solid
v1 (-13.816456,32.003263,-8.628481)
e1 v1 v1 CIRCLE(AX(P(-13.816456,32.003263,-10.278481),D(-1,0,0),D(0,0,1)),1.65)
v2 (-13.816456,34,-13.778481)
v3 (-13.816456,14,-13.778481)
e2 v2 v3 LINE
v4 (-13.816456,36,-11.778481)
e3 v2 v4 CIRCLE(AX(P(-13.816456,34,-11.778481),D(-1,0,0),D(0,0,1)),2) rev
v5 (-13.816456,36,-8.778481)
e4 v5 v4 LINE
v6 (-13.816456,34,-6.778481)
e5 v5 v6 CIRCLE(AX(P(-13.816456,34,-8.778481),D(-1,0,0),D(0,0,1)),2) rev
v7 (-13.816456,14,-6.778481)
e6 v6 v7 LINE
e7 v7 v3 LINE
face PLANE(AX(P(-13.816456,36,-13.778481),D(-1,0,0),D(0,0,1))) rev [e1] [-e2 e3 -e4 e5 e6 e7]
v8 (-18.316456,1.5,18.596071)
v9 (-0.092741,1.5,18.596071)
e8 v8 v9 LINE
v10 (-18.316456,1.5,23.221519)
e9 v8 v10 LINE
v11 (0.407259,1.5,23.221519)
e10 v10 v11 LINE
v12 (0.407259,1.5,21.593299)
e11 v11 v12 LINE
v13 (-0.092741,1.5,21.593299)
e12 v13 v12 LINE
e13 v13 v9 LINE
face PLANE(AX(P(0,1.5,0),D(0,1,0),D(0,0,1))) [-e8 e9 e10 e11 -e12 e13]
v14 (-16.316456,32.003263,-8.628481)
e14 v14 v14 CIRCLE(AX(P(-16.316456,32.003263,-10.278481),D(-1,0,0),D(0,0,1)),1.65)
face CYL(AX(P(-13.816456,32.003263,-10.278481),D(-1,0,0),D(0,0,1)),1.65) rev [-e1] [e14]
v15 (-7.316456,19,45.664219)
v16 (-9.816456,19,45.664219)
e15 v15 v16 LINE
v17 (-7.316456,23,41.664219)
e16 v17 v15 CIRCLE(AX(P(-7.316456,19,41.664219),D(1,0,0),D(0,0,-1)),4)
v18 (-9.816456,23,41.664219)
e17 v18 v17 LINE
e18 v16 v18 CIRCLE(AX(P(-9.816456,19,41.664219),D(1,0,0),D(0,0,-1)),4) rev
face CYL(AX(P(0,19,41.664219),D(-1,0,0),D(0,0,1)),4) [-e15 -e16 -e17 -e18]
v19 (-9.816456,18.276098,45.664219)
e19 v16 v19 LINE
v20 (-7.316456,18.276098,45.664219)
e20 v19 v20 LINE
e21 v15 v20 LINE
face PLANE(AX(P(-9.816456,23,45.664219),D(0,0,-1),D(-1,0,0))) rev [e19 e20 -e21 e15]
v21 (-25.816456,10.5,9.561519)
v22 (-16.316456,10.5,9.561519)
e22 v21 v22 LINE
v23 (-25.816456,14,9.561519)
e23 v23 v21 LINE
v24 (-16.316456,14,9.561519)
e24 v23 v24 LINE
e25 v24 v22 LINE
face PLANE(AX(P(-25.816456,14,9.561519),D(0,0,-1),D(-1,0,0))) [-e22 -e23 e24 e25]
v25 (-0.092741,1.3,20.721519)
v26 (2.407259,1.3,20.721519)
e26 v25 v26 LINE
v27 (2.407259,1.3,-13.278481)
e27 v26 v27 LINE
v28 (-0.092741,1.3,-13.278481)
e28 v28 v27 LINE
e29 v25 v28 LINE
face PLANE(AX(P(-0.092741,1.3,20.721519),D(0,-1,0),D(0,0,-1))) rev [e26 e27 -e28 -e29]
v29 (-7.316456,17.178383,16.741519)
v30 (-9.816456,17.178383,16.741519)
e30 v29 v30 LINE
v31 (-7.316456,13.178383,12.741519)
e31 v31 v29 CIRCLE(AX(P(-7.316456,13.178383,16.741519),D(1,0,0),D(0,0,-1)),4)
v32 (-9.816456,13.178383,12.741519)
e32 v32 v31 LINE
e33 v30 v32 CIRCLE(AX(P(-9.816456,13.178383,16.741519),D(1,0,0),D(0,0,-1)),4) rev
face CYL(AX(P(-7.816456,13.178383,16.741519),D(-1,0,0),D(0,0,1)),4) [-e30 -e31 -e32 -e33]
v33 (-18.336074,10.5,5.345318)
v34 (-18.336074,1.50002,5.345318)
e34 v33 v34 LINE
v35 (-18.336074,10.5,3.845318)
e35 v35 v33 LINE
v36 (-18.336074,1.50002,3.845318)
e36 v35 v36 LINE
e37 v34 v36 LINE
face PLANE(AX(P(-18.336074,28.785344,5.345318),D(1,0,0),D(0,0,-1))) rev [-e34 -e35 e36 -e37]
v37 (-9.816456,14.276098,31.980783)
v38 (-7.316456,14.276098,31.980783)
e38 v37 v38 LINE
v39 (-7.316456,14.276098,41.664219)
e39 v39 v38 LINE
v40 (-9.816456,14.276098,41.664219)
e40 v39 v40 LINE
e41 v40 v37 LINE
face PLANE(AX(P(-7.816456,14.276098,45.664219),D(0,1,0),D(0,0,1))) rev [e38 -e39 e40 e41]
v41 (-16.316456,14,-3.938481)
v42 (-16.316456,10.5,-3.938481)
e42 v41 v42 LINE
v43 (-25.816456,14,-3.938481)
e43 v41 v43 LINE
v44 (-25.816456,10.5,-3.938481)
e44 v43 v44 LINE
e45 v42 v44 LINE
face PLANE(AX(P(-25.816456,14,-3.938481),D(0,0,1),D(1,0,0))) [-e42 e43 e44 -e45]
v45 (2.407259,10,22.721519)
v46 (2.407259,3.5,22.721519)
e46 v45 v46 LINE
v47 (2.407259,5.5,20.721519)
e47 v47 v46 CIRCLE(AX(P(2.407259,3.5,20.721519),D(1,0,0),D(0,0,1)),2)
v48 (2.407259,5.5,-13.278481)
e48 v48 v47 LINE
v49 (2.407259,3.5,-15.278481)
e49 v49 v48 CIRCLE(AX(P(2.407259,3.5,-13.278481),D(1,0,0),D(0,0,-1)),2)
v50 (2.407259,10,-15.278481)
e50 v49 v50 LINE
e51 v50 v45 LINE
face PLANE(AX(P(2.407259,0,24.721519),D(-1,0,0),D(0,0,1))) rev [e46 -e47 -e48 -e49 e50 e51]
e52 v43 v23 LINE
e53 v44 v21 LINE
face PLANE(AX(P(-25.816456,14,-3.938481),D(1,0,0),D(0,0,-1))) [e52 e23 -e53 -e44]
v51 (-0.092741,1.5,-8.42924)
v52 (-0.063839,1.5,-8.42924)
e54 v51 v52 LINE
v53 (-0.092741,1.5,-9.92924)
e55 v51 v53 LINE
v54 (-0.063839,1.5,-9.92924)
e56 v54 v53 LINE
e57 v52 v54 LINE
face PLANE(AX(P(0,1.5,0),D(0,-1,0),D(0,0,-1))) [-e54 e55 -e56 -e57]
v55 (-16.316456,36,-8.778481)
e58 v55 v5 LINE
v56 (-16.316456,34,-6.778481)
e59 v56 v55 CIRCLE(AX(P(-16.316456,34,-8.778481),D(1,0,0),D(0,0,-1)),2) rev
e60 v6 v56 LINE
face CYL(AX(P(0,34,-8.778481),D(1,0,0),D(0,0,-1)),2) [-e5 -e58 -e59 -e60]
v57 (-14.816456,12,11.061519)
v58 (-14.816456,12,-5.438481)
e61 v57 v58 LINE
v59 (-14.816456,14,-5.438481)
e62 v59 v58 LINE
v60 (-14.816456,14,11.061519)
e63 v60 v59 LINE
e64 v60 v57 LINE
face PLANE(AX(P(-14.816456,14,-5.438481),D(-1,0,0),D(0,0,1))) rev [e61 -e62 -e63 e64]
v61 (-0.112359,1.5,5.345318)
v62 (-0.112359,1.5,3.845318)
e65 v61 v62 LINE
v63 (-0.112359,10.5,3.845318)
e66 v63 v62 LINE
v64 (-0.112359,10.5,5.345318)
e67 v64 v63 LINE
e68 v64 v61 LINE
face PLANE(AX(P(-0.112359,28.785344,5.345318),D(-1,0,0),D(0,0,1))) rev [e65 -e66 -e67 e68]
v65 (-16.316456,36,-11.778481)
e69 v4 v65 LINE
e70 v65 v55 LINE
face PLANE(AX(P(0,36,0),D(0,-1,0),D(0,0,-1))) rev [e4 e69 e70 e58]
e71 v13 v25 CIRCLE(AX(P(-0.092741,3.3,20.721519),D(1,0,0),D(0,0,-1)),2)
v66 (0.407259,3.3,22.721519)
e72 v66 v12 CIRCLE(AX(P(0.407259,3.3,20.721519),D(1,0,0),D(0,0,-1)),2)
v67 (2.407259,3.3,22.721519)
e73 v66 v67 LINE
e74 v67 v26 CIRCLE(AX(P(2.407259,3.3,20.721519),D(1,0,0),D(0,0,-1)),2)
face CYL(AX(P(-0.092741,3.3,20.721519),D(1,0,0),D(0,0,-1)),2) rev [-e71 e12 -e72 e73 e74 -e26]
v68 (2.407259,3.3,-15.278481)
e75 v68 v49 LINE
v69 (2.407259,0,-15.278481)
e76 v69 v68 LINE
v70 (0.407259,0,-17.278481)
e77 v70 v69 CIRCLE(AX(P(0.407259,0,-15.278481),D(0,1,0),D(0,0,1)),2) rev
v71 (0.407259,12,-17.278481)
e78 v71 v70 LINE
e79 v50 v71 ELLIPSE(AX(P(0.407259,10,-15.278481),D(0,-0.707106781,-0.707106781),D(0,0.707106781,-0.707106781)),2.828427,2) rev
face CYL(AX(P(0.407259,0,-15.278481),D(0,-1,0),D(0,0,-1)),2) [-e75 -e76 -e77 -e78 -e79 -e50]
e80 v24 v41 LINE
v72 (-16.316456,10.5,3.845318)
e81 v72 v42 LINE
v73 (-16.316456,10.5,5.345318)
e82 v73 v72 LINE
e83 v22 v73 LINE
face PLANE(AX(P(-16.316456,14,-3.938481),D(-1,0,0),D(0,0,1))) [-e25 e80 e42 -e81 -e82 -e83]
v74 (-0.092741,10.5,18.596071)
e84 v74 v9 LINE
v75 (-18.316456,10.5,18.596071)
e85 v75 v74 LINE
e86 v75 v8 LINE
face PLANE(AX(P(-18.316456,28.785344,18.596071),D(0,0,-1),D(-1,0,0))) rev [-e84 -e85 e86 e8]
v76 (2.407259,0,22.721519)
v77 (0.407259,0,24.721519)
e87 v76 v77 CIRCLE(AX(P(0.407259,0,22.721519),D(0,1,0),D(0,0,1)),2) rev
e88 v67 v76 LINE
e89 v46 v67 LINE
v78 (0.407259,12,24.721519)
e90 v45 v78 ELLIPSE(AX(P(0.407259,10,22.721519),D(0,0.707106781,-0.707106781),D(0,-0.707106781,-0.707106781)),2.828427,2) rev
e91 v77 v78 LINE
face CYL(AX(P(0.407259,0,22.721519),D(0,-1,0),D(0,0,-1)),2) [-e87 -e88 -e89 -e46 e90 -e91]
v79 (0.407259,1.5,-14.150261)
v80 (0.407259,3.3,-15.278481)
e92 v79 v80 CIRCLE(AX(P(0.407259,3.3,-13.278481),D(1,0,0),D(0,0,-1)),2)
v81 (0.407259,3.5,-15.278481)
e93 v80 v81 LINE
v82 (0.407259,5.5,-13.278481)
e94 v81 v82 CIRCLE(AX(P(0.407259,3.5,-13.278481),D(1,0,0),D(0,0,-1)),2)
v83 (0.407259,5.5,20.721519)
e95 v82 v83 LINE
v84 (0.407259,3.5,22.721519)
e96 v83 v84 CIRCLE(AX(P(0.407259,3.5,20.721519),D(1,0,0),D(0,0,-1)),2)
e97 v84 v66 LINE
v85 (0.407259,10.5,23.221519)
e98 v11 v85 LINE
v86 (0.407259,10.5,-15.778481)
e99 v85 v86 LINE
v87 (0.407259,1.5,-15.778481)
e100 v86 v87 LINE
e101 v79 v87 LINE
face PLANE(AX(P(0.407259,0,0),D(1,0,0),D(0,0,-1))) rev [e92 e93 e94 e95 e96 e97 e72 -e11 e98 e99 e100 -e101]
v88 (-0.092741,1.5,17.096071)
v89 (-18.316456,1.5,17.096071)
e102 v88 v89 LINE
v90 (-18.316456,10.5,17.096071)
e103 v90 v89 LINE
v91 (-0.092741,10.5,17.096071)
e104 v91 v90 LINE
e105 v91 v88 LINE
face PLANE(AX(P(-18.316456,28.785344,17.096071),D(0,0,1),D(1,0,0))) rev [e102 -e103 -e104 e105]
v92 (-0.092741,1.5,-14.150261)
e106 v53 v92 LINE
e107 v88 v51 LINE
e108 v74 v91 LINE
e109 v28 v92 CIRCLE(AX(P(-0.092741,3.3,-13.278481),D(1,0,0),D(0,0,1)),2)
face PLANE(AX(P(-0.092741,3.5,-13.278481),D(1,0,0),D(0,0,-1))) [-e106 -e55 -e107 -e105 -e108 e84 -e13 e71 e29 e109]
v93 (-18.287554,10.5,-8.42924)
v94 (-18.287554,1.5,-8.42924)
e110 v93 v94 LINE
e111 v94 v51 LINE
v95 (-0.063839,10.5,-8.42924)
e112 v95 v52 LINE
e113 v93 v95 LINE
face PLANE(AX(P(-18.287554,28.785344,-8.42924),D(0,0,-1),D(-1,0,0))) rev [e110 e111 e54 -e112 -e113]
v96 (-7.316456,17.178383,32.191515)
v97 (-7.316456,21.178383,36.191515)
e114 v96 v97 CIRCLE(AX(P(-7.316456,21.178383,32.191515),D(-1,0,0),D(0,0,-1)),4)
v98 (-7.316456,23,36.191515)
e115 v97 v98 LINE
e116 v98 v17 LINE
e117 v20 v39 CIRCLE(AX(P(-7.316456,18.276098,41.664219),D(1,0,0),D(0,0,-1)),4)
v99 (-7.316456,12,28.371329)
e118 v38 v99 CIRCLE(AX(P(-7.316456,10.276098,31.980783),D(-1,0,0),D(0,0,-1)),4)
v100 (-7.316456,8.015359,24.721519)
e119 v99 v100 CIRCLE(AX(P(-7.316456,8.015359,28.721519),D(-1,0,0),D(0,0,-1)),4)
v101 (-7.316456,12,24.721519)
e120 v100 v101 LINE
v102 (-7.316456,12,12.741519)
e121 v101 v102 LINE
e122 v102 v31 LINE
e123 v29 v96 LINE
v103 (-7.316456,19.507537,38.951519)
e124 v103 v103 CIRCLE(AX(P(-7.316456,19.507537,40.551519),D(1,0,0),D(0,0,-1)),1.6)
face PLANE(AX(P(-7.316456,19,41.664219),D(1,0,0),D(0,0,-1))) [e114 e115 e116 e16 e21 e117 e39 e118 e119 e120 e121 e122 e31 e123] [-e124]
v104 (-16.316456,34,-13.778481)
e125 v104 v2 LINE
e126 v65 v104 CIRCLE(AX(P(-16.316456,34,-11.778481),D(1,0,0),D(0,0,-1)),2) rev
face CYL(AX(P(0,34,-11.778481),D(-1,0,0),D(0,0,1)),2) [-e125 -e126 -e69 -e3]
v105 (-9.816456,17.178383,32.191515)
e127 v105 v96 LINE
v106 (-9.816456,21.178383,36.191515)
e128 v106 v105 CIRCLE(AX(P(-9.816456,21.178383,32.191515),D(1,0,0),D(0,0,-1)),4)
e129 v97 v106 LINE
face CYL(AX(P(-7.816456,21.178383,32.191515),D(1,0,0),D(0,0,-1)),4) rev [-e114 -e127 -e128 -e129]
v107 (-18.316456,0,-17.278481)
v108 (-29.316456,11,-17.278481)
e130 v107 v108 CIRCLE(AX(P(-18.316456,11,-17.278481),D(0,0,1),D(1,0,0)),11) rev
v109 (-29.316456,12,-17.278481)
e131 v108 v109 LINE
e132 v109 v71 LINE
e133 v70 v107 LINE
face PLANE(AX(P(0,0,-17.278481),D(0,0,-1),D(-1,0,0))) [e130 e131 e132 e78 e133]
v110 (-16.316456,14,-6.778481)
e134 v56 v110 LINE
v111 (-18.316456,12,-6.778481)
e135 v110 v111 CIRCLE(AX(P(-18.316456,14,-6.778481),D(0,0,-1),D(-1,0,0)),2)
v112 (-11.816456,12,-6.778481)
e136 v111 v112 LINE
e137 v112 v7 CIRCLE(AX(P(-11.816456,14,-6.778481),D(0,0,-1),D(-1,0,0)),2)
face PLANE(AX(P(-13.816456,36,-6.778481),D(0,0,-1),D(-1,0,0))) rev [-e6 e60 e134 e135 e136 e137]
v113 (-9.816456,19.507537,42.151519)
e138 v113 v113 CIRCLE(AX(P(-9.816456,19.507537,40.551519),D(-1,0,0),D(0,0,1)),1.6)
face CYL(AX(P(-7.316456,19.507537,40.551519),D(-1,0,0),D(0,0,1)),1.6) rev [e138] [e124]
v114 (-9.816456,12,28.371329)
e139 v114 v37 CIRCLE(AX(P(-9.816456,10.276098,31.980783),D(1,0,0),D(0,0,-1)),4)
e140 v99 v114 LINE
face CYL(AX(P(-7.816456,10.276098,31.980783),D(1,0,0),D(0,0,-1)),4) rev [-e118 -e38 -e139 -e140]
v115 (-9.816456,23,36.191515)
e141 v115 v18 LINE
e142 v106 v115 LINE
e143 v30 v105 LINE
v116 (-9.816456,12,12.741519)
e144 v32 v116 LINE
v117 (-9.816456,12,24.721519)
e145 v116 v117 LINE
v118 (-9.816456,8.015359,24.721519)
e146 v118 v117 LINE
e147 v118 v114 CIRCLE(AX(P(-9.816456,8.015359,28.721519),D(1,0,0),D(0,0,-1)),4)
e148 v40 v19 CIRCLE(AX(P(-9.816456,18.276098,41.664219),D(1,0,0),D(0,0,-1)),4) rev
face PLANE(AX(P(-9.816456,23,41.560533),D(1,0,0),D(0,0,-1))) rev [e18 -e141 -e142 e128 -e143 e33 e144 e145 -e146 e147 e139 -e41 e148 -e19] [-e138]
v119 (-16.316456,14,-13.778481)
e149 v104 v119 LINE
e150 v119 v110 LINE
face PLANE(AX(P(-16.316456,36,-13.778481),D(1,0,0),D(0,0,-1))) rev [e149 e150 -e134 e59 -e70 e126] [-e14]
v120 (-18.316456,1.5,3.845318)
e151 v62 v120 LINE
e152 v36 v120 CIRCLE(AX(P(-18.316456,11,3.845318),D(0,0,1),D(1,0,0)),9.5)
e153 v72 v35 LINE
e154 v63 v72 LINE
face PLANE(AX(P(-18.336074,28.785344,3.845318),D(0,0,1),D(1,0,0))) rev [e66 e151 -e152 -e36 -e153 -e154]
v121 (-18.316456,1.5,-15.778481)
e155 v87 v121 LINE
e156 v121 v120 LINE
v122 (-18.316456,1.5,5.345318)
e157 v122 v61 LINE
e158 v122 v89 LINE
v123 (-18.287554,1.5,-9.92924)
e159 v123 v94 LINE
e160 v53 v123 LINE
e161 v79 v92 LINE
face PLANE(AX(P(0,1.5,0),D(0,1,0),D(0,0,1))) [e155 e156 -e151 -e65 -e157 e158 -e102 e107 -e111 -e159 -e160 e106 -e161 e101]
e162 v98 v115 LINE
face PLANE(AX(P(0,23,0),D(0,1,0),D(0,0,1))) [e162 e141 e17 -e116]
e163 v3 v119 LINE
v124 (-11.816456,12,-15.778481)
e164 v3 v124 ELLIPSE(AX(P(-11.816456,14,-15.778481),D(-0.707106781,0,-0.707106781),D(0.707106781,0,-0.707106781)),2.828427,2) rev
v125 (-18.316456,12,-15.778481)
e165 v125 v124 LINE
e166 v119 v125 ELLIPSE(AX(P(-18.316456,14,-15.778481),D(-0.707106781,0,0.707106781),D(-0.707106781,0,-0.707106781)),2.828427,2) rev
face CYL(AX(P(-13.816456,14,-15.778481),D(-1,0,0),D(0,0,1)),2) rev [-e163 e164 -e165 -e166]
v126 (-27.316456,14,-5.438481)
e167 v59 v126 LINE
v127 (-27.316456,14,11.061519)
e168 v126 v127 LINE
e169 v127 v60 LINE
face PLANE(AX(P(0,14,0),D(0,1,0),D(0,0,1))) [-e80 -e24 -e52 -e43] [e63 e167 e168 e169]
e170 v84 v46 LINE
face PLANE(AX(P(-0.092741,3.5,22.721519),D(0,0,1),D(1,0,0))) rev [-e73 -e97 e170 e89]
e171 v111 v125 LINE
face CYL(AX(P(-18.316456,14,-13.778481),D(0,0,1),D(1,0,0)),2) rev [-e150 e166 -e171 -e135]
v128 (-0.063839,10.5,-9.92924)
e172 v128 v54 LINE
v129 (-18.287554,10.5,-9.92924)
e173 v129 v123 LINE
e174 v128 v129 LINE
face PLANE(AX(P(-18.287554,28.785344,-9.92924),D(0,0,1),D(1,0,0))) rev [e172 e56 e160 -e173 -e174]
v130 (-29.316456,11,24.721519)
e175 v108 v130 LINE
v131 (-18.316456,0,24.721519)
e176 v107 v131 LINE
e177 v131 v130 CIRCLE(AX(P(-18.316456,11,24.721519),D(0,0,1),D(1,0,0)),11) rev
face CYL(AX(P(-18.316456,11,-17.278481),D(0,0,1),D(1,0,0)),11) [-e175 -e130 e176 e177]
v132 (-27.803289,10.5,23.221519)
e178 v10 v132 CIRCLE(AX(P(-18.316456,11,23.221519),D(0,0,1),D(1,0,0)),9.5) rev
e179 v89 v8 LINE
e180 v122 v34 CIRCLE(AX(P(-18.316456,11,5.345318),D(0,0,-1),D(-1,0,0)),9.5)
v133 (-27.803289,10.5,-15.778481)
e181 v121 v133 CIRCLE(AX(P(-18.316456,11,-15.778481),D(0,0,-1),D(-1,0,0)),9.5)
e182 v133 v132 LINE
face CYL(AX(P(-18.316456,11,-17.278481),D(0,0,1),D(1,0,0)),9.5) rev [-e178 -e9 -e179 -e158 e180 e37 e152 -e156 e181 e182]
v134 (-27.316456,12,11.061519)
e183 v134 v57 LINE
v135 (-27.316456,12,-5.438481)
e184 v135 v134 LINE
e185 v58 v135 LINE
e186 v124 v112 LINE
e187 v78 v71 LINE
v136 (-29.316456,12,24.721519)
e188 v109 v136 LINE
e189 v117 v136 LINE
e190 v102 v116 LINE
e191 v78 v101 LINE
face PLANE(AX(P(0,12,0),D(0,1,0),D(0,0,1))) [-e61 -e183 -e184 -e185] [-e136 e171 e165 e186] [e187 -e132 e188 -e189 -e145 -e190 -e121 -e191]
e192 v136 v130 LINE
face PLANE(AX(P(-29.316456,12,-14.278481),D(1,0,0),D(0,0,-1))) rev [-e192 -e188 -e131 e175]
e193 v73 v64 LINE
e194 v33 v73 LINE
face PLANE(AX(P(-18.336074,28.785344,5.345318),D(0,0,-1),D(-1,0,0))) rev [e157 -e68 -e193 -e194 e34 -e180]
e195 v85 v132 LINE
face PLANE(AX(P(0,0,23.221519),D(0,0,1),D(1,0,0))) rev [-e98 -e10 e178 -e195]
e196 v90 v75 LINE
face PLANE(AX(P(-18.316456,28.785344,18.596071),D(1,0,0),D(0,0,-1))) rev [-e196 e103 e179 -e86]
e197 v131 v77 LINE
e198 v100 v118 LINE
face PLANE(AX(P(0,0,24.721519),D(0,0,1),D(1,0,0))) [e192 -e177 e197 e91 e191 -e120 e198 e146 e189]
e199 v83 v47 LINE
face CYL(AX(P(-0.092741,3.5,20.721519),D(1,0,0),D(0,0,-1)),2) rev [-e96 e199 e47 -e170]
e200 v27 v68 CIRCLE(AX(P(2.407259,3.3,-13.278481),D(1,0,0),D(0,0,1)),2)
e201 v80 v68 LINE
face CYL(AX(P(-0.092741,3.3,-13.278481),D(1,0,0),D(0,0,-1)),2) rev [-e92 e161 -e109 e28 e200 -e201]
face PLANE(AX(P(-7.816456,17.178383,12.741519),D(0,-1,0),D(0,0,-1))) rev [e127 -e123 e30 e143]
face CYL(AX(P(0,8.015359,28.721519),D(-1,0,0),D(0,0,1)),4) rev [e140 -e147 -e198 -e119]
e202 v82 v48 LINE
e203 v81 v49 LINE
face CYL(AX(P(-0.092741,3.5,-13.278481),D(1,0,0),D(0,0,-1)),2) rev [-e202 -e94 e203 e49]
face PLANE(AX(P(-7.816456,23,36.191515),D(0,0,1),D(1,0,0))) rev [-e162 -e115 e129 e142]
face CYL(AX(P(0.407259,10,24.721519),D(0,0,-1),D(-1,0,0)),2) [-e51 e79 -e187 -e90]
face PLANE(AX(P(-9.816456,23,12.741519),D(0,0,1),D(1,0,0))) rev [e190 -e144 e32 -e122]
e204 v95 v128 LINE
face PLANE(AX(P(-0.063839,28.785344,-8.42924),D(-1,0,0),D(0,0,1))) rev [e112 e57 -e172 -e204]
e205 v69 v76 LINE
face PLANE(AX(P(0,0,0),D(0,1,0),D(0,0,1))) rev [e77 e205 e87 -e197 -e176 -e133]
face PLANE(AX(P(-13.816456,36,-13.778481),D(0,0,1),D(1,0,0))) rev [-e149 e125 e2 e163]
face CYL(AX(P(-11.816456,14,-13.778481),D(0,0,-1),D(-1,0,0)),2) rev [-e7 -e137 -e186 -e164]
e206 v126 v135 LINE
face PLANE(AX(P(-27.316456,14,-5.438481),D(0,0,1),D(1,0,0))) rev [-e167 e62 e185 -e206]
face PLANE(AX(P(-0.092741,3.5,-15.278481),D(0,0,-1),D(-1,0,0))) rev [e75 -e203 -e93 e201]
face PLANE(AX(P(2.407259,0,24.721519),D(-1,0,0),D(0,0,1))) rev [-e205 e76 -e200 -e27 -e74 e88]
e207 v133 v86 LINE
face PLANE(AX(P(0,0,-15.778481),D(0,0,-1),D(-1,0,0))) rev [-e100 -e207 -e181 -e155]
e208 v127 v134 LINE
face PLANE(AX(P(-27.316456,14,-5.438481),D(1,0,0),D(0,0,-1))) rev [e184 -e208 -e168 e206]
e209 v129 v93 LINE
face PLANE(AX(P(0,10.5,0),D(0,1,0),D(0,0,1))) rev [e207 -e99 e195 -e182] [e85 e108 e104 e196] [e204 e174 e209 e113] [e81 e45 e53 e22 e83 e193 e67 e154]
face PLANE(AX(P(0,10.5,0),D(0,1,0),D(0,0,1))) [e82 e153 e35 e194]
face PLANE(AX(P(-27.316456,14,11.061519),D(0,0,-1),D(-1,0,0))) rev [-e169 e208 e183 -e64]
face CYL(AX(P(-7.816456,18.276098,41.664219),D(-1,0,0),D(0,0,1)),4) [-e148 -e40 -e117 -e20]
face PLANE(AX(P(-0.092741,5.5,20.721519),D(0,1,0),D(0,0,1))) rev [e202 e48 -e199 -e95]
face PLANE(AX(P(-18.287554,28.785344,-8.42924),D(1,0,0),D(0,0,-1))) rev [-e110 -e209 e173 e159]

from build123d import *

# Parameters (mm, degrees)
SALIENTE_EXTRUIR1_DEPTH  = 12
CROQUIS2_W               = 12.5
CROQUIS2_H               = 16.5
CROQUIS2_W_2             = 9.5
CROQUIS2_H_2             = 13.5
SALIENTE_EXTRUIR2_DEPTH  = 2
SALIENTE_EXTRUIR4_DEPTH  = 11
CROQUIS4_R               = 1.6
CORTAR_EXTRUIR1_DEPTH    = 2.5
CROQUIS5_W               = 17.29289048
CROQUIS5_H               = 2.276098228
CROQUIS5_W_2             = 23.449996424
CROQUIS5_H_2             = 5.821617307
CORTAR_EXTRUIR2_DEPTH    = 2
SALIENTE_EXTRUIR5_DEPTH  = 3
CROQUIS7_W               = 60
CROQUIS7_H               = 12
SALIENTE_EXTRUIR6_DEPTH  = 3
CORTAR_EXTRUIR3_DEPTH    = 42
VACIADO4_START           = -15.778481013
VACIADO4_DEPTH           = 39
VACIADO4_2_OUTLINE_W     = 28
VACIADO4_2_OUTLINE_H     = 9
VACIADO4_2_DEPTH         = 4
VACIADO4_START_2         = 19.221518987
VACIADO4_3_OUTLINE_W     = 28
VACIADO4_3_OUTLINE_H     = 9
VACIADO4_3_DEPTH         = 4
VACIADO4_START_3         = -3.938481013
VACIADO4_4_OUTLINE_W     = 9.5
VACIADO4_4_OUTLINE_H     = 1.5
VACIADO4_4_DEPTH         = 13.5
REDONDEO2_R              = 4
REDONDEO3_R              = 4
CROQUIS10_W              = 2.5
CROQUIS10_H              = 7
SALIENTE_EXTRUIR8_DEPTH  = 24
CROQUIS11_R              = 1.65
CORTAR_EXTRUIR4_DEPTH    = 2.5
CROQUIS14_R              = 1.6
SALIENTE_EXTRUIR10_DEPTH = 0.5
CROQUIS15_W              = 28.276285021
CROQUIS15_H              = 42
CORTAR_EXTRUIR5_DEPTH    = 12
CROQUIS16_W              = 42
CROQUIS16_H              = 12
SALIENTE_EXTRUIR11_DEPTH = 2
CORTAR_EXTRUIR6_DEPTH    = 2.5
CROQUIS19_W              = 18.223714979
CROQUIS19_H              = 1.5
SALIENTE_EXTRUIR16_DEPTH = 9
REDONDEO4_R              = 2
REDONDEO5_R              = 2
REDONDEO6_R              = 2


with BuildPart() as part:
    # Croquis1 → Saliente-Extruir1 (new body)
    with BuildSketch(Plane(origin=(0, 0, 0), x_dir=(1, 0, 0), z_dir=(0, 1, 0))):
        Polygon((30.683544304, -17.721518987), (30.683544304, -21.721518987), (-29.316455696, -21.721518987), (-29.316455696, 14.278481013), (30.683544304, 14.278481013), (30.683544304, 10.278481013), (2.683544304, 10.278481013), (2.683544304, -17.721518987), align=None)
    extrude(amount=SALIENTE_EXTRUIR1_DEPTH)

    # Croquis2 → Saliente-Extruir2 (add)
    with BuildSketch(Plane(origin=(0, 12, 0), x_dir=(1, 0, 0), z_dir=(0, 1, 0))):
        with Locations((-21.066455696, -2.811518987)):
            Rectangle(CROQUIS2_W, CROQUIS2_H)
        with Locations((-21.066455696, -2.811518987)):
            Rectangle(CROQUIS2_W_2, CROQUIS2_H_2, mode=Mode.SUBTRACT)
    extrude(amount=SALIENTE_EXTRUIR2_DEPTH)

    # Croquis3 → Saliente-Extruir4 (add)
    with BuildSketch(Plane(origin=(0, 12, 0), x_dir=(1, 0, 0), z_dir=(0, 1, 0))):
        Polygon((-7.816455696, -12.741518987), (-7.816455696, -41.560532566), (-7.816455696, -45.664219129), (-9.816455696, -45.664219129), (-9.816455696, -41.560532566), (-9.816455696, -12.741518987), align=None)
    extrude(amount=SALIENTE_EXTRUIR4_DEPTH)

    # Croquis4 → Cortar-Extruir1 (cut)
    with BuildSketch(Plane.ZY.offset(9.816455696)):
        with Locations((40.551518987, 19.507537468)):
            Circle(CROQUIS4_R)
    extrude(amount=-CORTAR_EXTRUIR1_DEPTH, mode=Mode.SUBTRACT)

    # Croquis5 → Cortar-Extruir2 (cut)
    with BuildSketch(Plane.ZY.offset(9.816455696)):
        with Locations((37.017773889, 13.138049114)):
            Rectangle(CROQUIS5_W, CROQUIS5_H)
        with Locations((24.466517199, 20.089191347)):
            Rectangle(CROQUIS5_W_2, CROQUIS5_H_2)
    extrude(amount=-CORTAR_EXTRUIR2_DEPTH, mode=Mode.SUBTRACT)

    # Croquis6 → Saliente-Extruir5 (add)
    with BuildSketch(Plane.XY.offset(21.721518987)):
        Polygon((-29.316455696, 0), (30.683544304, 0), (30.683544304, 12), (-7.816455696, 12), (-9.816455696, 12), (-29.316455696, 12), align=None)
    extrude(amount=SALIENTE_EXTRUIR5_DEPTH)

    # Croquis7 → Saliente-Extruir6 (add)
    with BuildSketch(Plane(origin=(0, 0, -14.278481013), x_dir=(-1, 0, 0), z_dir=(0, 0, -1))):
        with Locations((-0.683544304, 6)):
            Rectangle(CROQUIS7_W, CROQUIS7_H)
    extrude(amount=SALIENTE_EXTRUIR6_DEPTH)

    # Croquis8 → Cortar-Extruir3 (cut)
    with BuildSketch(Plane.XY.offset(24.721518987)):
        with BuildLine():
            Line((-29.316455696, 0), (-18.316455696, 0))
            ThreePointArc((-18.316455696, 0), (-26.094630289, 3.221825407), (-29.316455696, 11))
            Line((-29.316455696, 11), (-29.316455696, 0))
        make_face()
    extrude(amount=-CORTAR_EXTRUIR3_DEPTH, mode=Mode.SUBTRACT)

    # Vaciado4: read off the stored shape, not the designer's step
    # Vaciado4 outline → Vaciado4 (cut)
    with BuildSketch(Plane.XY.offset(VACIADO4_START)):
        with BuildLine():
            Line((1.183544304, 10.5), (-27.803288677, 10.5))
            ThreePointArc((-27.803288677, 10.5), (-24.854804112, 4.107975624), (-18.316455696, 1.5))
            Line((-18.316455696, 1.5), (1.183544304, 1.5))
            Line((1.183544304, 1.5), (1.183544304, 10.5))
        make_face()
    extrude(amount=VACIADO4_DEPTH, mode=Mode.SUBTRACT)

    # Vaciado4 2 outline → Vaciado4 2 (cut)
    with BuildSketch(Plane.XY.offset(VACIADO4_START)):
        with Locations((15.183544304, 6)):
            Rectangle(VACIADO4_2_OUTLINE_W, VACIADO4_2_OUTLINE_H)
    extrude(amount=VACIADO4_2_DEPTH, mode=Mode.SUBTRACT)

    # Vaciado4 3 outline → Vaciado4 3 (cut)
    with BuildSketch(Plane.XY.offset(VACIADO4_START_2)):
        with Locations((15.183544304, 6)):
            Rectangle(VACIADO4_3_OUTLINE_W, VACIADO4_3_OUTLINE_H)
    extrude(amount=VACIADO4_3_DEPTH, mode=Mode.SUBTRACT)

    # Vaciado4 4 outline → Vaciado4 4 (cut)
    with BuildSketch(Plane.XY.offset(VACIADO4_START_3)):
        with Locations((-21.066455696, 11.25)):
            Rectangle(VACIADO4_4_OUTLINE_W, VACIADO4_4_OUTLINE_H)
    extrude(amount=VACIADO4_4_DEPTH, mode=Mode.SUBTRACT)

    # Redondeo2
    # the kernel refuses this fillet: 4 mm, written as the material it adds along each edge
    with BuildSketch(Plane(origin=(-9.816455696, 12, 24.721518987), x_dir=(0, -1, 0), z_dir=(1, 0, 0))) as redondeo2_piece_1:
        with BuildLine():
            CenterArc((3.984641355, -4), REDONDEO2_R, 90, 84.977462971)
            Line((0, -3.649809662), (0, 0))
            Line((0, 0), (3.984641355, 0))
        make_face()
    extrude(amount=2)
    with BuildSketch(Plane(origin=(-9.816455696, 14.276098228, 28.371328649), x_dir=(0, 0, 1), z_dir=(1, 0, 0))) as redondeo2_piece_2:
        with BuildLine():
            CenterArc((3.609454623, 4), REDONDEO2_R, 205.52948015, 64.47051985)
            Line((0, 2.276098228), (0, 0))
            Line((0, 0), (3.609454623, 0))
        make_face()
    extrude(amount=2)
    with BuildSketch(Plane(origin=(-9.816455696, 17.178382693, 36.191515411), x_dir=(0, 0, -1), z_dir=(1, 0, 0))) as redondeo2_piece_3:
        with BuildLine():
            CenterArc((REDONDEO2_R, REDONDEO2_R), REDONDEO2_R, 180, 90)
            Line((0, REDONDEO2_R), (0, 0))
            Line((0, 0), (REDONDEO2_R, 0))
        make_face()
    extrude(amount=2)
    # the kernel refuses this fillet: 4 mm, written as the material it takes off along each edge
    with BuildSketch(Plane(origin=(-19.816455696, 17.178382693, 12.741518987), x_dir=(0, 0, 1), z_dir=(1, 0, 0))) as redondeo2_2_piece_1:
        with BuildLine():
            CenterArc((REDONDEO2_R, REDONDEO2_R), REDONDEO2_R, 180, 90)
            Line((0, REDONDEO2_R), (0, 0))
            Line((0, 0), (REDONDEO2_R, 0))
        make_face()
    extrude(amount=22, mode=Mode.SUBTRACT)

    # Redondeo3
    redondeo3_edges = [part.edges().sort_by_distance(p)[0] for p in [
        (-8.816455696, 23, 45.664219129),
        (-8.816455696, 14.276098228, 45.664219129),
    ]]
    fillet(redondeo3_edges, radius=REDONDEO3_R)

    # Croquis10 → Saliente-Extruir8 (add)
    with BuildSketch(Plane(origin=(0, 12, 0), x_dir=(1, 0, 0), z_dir=(0, 1, 0))):
        with Locations((-15.066455696, 10.278481013)):
            Rectangle(CROQUIS10_W, CROQUIS10_H)
    extrude(amount=SALIENTE_EXTRUIR8_DEPTH)

    # Croquis11 → Cortar-Extruir4 (cut)
    with BuildSketch(Plane.ZY.offset(16.316455696)):
        with Locations((-10.278481013, 32.003262859)):
            Circle(CROQUIS11_R)
    extrude(amount=-CORTAR_EXTRUIR4_DEPTH, mode=Mode.SUBTRACT)

    # Croquis14 → Saliente-Extruir10 (add)
    with BuildSketch(Plane(origin=(-7.816455696, 0, 0), x_dir=(0, 0, -1), z_dir=(1, 0, 0))):
        with BuildLine():
            Line((-36.191515411, 23), (-41.664219129, 23))
            ThreePointArc((-41.664219129, 23), (-44.492646254, 21.828427125), (-45.664219129, 19))
            Line((-45.664219129, 19), (-45.664219129, 18.276098228))
            ThreePointArc((-45.664219129, 18.276098228), (-44.492646254, 15.447671103), (-41.664219129, 14.276098228))
            Line((-41.664219129, 14.276098228), (-31.980783273, 14.276098228))
            ThreePointArc((-31.980783273, 14.276098228), (-29.847195577, 13.659558519), (-28.371328649, 12))
            ThreePointArc((-28.371328649, 12), (-25.771878217, 10.717139414), (-24.721518987, 8.015358645))
            Line((-24.721518987, 8.015358645), (-24.721518987, 12))
            Line((-24.721518987, 12), (-12.741518987, 12))
            Line((-12.741518987, 12), (-12.741518987, 13.178382693))
            ThreePointArc((-12.741518987, 13.178382693), (-13.913091863, 16.006809817), (-16.741518987, 17.178382693))
            Line((-16.741518987, 17.178382693), (-32.191515411, 17.178382693))
            ThreePointArc((-32.191515411, 17.178382693), (-35.019942535, 18.349955568), (-36.191515411, 21.178382693))
            Line((-36.191515411, 21.178382693), (-36.191515411, 23))
        make_face()
        with Locations(Location((-40.551518987, 19.507537468, 0), (0, 0, 180))):
            Circle(CROQUIS14_R, mode=Mode.SUBTRACT)
    extrude(amount=SALIENTE_EXTRUIR10_DEPTH)

    # Croquis15 → Cortar-Extruir5 (cut)
    with BuildSketch(Plane(origin=(0, 12, 0), x_dir=(1, 0, 0), z_dir=(0, 1, 0))):
        with Locations((16.545401794, -3.721518987)):
            Rectangle(CROQUIS15_W, CROQUIS15_H)
    extrude(amount=-CORTAR_EXTRUIR5_DEPTH, mode=Mode.SUBTRACT)

    # Croquis16 → Saliente-Extruir11 (add)
    with BuildSketch(Plane(origin=(2.407259283, 0, 0), x_dir=(0, 0, -1), z_dir=(1, 0, 0))):
        with Locations((-3.721518987, 6)):
            Rectangle(CROQUIS16_W, CROQUIS16_H)
    extrude(amount=-SALIENTE_EXTRUIR11_DEPTH)

    # Croquis18 → Cortar-Extruir6 (cut)
    with BuildSketch(Plane(origin=(2.407259283, 0, 0), x_dir=(0, 0, -1), z_dir=(1, 0, 0))):
        with BuildLine():
            Line((-20.721518987, 5.5), (13.278481013, 5.5))
            ThreePointArc((13.278481013, 5.5), (14.692694575, 4.914213562), (15.278481013, 3.5))
            Line((15.278481013, 3.5), (15.278481013, 3.3))
            ThreePointArc((15.278481013, 3.3), (14.692694575, 1.885786438), (13.278481013, 1.3))
            Line((13.278481013, 1.3), (-20.721518987, 1.3))
            ThreePointArc((-20.721518987, 1.3), (-22.13573255, 1.885786438), (-22.721518987, 3.3))
            Line((-22.721518987, 3.3), (-22.721518987, 3.5))
            ThreePointArc((-22.721518987, 3.5), (-22.13573255, 4.914213562), (-20.721518987, 5.5))
        make_face()
    extrude(amount=-CORTAR_EXTRUIR6_DEPTH, mode=Mode.SUBTRACT)

    # Croquis19 → Saliente-Extruir16 (add)
    with BuildSketch(Plane(origin=(0, 1.5, 0), x_dir=(1, 0, 0), z_dir=(0, 1, 0))):
        with Locations((-9.204598207, -17.846071371)):
            Rectangle(CROQUIS19_W, CROQUIS19_H)
        with Locations((-9.224216979, -4.59531752)):
            Rectangle(CROQUIS19_W, CROQUIS19_H)
        with Locations((-9.175696895, 9.179239743)):
            Rectangle(CROQUIS19_W, CROQUIS19_H)
    extrude(amount=SALIENTE_EXTRUIR16_DEPTH)

    # Redondeo4
    # the kernel refuses this fillet: 2 mm, written as the material it takes off along each edge
    with BuildSketch(Plane(origin=(2.407259283, 12, -22.278481013), x_dir=(-1, 0, 0), z_dir=(0, 0, 1))) as redondeo4_piece_1:
        with BuildLine():
            CenterArc((REDONDEO4_R, REDONDEO4_R), REDONDEO4_R, 180, 90)
            Line((0, REDONDEO4_R), (0, 0))
            Line((0, 0), (REDONDEO4_R, 0))
        make_face()
    extrude(amount=52, mode=Mode.SUBTRACT)
    with BuildSketch(Plane(origin=(2.407259283, 17, 24.721518987), x_dir=(-1, 0, 0), z_dir=(0, -1, 0)), Plane(origin=(2.407259283, 17, -17.278481013), x_dir=(0, 0, 1), z_dir=(0, -1, 0))) as redondeo4_piece_2:
        with BuildLine():
            CenterArc((REDONDEO4_R, REDONDEO4_R), REDONDEO4_R, 180, 90)
            Line((0, REDONDEO4_R), (0, 0))
            Line((0, 0), (REDONDEO4_R, 0))
        make_face()
    extrude(amount=22, mode=Mode.SUBTRACT)

    # Redondeo5
    redondeo5_edges = [part.edges().sort_by_distance(p)[0] for p in [
        (-15.066455696, 36, -13.778481013),
        (-15.066455696, 36, -6.778481013),
    ]]
    fillet(redondeo5_edges, radius=REDONDEO5_R)

    # Redondeo6
    redondeo6_edges = [part.edges().sort_by_distance(p)[0] for p in [
        (-13.816455696, 12, -10.278481013),
        (-15.066455696, 12, -13.778481013),
        (-16.316455696, 12, -10.278481013),
    ]]
    fillet(redondeo6_edges, radius=REDONDEO6_R)


solid = part.part
